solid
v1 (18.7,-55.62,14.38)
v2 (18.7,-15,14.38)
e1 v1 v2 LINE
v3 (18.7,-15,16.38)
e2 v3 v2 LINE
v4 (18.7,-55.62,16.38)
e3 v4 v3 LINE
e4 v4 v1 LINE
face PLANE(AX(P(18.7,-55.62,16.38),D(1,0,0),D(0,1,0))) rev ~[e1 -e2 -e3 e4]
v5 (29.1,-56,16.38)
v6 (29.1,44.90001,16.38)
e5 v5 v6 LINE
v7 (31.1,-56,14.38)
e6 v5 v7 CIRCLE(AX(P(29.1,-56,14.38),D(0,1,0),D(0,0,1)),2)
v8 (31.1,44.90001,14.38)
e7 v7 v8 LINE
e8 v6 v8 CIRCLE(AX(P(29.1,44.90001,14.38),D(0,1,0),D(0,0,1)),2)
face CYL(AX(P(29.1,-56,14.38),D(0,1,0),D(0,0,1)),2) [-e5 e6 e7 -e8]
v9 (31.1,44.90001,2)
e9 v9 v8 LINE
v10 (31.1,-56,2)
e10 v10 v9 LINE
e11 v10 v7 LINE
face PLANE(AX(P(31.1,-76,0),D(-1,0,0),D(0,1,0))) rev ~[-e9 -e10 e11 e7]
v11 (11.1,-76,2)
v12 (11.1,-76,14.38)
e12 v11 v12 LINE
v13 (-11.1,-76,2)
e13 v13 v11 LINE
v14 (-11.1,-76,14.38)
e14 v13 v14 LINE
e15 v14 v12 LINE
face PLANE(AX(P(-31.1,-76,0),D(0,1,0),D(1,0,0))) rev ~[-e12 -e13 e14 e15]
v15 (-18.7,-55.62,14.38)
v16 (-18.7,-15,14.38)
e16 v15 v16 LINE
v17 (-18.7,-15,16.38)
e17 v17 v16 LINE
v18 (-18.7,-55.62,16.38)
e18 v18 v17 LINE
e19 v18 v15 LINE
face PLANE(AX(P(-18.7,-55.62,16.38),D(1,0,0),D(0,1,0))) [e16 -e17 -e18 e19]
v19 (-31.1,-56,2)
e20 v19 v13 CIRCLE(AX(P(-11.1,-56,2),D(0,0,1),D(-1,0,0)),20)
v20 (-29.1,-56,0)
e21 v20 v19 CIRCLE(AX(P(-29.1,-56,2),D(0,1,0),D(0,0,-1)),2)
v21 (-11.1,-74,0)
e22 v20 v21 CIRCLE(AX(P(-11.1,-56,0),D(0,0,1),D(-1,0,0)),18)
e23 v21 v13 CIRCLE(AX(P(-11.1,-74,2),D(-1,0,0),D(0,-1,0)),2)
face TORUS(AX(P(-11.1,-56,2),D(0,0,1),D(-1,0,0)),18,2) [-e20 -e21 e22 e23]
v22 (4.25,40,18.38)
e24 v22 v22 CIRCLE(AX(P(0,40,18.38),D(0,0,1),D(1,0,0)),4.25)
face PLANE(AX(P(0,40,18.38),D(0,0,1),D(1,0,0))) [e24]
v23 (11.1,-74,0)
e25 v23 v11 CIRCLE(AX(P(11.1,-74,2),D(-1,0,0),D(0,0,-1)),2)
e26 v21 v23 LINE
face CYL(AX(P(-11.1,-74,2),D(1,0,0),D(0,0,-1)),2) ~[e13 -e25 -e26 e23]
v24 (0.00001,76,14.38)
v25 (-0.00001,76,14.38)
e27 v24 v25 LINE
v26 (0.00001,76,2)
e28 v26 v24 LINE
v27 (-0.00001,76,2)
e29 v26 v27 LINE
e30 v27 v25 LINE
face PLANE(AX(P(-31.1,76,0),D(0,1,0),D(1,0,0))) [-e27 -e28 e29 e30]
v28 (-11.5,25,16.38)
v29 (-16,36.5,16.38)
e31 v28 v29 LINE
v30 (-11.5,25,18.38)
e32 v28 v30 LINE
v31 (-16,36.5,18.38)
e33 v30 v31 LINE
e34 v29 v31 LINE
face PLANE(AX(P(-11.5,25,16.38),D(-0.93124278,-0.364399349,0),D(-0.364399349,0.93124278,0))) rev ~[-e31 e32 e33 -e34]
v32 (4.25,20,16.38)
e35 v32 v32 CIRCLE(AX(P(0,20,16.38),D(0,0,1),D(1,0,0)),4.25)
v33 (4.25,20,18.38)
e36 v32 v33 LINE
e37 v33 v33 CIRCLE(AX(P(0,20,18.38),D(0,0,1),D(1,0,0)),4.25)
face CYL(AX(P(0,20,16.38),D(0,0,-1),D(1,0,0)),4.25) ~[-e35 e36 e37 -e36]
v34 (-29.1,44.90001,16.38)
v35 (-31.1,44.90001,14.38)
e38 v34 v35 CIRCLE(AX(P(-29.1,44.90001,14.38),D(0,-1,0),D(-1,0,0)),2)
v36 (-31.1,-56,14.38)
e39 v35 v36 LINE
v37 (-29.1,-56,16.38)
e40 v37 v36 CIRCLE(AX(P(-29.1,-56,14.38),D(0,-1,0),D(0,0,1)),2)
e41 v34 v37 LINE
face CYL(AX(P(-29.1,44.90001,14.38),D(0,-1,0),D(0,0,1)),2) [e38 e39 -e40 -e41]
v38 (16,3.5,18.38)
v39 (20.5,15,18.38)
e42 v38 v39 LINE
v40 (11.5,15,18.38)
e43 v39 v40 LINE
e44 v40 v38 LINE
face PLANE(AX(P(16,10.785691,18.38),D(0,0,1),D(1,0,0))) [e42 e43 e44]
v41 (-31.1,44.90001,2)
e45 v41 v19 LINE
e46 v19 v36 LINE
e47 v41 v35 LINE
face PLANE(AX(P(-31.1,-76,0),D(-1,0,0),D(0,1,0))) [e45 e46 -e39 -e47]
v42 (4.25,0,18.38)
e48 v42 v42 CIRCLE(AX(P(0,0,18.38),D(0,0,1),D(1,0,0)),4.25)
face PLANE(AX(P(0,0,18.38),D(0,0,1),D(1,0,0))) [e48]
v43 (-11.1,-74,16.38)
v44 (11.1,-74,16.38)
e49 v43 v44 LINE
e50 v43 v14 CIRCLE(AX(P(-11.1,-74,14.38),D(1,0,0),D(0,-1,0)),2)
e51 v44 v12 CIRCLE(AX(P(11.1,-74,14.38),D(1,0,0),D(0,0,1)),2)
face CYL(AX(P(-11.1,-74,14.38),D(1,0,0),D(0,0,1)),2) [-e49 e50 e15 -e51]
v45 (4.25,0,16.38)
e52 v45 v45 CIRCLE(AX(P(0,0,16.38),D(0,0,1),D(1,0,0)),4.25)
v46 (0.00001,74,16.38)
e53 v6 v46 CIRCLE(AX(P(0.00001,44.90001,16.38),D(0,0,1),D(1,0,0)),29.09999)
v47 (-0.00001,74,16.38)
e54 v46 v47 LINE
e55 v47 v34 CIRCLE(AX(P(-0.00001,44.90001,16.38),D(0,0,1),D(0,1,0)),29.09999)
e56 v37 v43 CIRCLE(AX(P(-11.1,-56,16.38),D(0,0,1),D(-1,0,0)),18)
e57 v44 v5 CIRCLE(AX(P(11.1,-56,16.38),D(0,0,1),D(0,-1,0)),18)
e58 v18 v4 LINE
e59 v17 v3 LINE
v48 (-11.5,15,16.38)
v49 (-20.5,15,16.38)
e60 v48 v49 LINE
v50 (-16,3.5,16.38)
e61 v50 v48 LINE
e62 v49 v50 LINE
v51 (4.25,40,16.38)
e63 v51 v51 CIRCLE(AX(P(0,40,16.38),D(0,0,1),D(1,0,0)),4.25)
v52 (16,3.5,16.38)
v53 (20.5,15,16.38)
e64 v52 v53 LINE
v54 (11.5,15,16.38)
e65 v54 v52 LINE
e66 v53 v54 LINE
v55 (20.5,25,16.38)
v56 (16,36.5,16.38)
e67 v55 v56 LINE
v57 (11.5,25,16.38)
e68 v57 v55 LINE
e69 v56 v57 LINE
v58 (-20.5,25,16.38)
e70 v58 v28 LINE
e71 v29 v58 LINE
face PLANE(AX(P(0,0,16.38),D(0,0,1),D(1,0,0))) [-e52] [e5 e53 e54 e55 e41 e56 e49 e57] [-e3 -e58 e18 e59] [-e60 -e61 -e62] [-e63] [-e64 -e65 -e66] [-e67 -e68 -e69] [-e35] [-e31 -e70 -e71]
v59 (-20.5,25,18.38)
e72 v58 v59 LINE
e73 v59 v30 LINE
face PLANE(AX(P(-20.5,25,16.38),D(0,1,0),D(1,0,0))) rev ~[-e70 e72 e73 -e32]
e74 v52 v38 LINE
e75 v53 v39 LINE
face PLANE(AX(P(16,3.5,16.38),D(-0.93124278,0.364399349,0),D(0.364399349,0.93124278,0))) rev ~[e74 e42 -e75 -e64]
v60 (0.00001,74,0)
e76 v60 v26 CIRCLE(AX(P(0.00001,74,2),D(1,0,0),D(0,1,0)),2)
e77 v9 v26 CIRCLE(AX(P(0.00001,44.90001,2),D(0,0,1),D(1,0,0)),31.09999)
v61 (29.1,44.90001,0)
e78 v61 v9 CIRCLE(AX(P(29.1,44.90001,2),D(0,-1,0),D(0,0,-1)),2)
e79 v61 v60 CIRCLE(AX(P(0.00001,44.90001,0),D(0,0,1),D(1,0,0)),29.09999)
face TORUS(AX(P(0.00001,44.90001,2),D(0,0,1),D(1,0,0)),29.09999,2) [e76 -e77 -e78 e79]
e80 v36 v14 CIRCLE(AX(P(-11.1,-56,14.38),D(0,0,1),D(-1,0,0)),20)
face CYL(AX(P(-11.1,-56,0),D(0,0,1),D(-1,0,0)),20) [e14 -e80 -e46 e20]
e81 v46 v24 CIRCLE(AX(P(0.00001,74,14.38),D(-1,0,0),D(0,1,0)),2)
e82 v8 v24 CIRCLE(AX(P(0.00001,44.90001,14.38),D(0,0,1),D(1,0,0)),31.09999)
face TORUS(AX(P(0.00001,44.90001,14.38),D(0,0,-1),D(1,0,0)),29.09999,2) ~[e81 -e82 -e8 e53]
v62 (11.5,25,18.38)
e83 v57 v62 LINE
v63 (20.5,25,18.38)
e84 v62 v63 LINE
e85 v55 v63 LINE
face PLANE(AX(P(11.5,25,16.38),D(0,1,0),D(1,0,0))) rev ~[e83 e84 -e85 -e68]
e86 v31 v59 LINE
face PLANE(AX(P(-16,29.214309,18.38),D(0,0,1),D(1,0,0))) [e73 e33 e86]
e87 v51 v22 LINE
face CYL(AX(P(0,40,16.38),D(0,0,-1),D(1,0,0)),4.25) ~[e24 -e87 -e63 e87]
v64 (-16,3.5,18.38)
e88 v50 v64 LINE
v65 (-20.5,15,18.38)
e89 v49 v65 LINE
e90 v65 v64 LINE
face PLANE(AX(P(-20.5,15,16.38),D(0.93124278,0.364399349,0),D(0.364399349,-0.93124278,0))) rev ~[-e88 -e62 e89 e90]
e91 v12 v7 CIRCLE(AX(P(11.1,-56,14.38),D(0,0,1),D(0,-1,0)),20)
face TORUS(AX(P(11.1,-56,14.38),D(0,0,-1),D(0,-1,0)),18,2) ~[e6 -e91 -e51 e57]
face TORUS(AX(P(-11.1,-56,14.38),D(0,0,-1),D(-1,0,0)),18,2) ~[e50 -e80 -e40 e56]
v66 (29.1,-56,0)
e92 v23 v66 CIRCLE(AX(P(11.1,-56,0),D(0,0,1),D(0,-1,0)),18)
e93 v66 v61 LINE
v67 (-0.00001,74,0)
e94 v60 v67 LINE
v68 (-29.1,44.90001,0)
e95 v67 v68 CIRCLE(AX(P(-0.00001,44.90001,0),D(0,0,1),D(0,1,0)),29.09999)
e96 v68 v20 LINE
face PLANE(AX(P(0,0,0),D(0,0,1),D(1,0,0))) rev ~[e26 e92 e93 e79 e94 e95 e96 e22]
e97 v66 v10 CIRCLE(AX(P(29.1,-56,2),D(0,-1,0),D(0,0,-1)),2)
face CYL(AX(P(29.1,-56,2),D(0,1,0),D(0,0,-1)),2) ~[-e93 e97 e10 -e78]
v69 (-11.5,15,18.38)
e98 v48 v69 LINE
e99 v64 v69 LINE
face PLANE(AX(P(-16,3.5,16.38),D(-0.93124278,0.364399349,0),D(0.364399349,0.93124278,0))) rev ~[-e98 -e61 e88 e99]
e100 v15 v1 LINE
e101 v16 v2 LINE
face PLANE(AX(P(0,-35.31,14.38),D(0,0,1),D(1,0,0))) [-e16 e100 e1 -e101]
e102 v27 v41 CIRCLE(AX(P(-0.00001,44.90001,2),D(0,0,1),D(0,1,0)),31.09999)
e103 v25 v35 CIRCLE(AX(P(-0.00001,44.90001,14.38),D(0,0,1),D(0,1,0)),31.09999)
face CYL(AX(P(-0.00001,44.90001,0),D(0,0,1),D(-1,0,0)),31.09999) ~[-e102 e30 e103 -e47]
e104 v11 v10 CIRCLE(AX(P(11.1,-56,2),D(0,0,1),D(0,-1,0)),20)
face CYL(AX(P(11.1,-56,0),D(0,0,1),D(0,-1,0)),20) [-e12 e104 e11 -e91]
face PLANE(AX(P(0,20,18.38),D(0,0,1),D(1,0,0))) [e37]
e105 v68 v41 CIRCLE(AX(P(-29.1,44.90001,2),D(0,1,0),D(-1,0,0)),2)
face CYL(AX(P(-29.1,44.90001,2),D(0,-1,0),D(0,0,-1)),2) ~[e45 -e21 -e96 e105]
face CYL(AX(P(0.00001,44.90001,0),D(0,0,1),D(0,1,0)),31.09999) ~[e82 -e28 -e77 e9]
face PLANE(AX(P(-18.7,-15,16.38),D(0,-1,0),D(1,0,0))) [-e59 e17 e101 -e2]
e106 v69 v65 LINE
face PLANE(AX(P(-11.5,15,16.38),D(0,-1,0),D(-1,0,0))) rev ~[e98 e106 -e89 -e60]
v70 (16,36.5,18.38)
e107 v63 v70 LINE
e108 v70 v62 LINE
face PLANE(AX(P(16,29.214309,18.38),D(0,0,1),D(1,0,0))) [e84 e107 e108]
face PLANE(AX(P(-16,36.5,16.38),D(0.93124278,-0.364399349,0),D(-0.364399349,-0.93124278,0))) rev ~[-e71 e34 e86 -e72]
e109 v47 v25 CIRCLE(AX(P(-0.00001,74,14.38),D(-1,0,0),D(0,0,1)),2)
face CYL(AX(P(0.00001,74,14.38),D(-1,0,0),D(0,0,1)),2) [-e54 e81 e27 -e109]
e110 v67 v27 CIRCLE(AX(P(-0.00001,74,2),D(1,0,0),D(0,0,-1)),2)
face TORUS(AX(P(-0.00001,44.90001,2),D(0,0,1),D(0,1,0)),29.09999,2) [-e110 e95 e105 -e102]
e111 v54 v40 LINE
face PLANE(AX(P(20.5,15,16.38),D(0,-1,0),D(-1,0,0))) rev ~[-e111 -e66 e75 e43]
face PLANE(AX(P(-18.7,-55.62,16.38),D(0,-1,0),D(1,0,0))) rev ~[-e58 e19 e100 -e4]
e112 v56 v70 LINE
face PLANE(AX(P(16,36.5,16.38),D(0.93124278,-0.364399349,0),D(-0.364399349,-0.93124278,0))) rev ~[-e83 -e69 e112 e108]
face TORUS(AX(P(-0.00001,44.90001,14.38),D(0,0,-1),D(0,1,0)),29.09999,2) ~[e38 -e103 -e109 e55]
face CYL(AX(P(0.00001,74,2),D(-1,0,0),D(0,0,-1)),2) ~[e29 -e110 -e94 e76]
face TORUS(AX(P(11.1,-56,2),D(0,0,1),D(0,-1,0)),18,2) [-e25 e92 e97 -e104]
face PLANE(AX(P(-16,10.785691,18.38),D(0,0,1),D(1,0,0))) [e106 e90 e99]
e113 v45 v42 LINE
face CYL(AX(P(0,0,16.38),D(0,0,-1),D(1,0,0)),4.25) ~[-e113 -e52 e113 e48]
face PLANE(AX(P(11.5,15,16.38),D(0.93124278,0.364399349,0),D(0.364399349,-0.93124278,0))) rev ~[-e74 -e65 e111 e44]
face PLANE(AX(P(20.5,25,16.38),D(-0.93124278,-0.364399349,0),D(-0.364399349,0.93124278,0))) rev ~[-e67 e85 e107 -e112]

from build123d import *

# Parameters (mm, degrees)
F0_W     = 62.2
F0_H     = 152
F1_DEPTH = 16.38
F2_R     = 20
F3_R     = 31.09999
F4_R     = 2
F5_W     = 37.4
F5_H     = 40.62
F6_DEPTH = 2
F7_R     = 4.25
F8_DEPTH = 2


# Not quite as in the source:
# - a fillet or chamfer is up to 0.001 mm smaller than in the source, because OpenCascade refuses the exact size


with BuildPart() as f1:
    # F0 (on Top) → F1 (new body)
    with BuildSketch(Plane.XY):
        Rectangle(F0_W, F0_H)
    extrude(amount=F1_DEPTH)

    # F2
    f2_edges = [f1.edges().sort_by_distance(p)[0] for p in [
        (-31.1, -76, 8.19),
        (31.1, -76, 8.19),
    ]]
    fillet(f2_edges, radius=F2_R)

    # F3 (radius 31.1 in the source; OpenCascade refuses exactly that, so slightly less here)
    f3_edges = [f1.edges().sort_by_distance(p)[0] for p in [
        (31.1, 76, 8.19),
        (-31.1, 76, 8.19),
    ]]
    fillet(f3_edges, radius=F3_R)

    # F4
    f4_edges = [f1.edges().sort_by_distance(p)[0] for p in [
        (31.1, -5.549995, 16.38),
        (31.1, -5.549995, 0),
    ]]
    fillet(f4_edges, radius=F4_R)

    # F5 (on face) → F6 (cut)
    with BuildSketch(Plane.XY.offset(16.38)):
        with Locations((0, -35.31)):
            Rectangle(F5_W, F5_H)
    extrude(amount=-F6_DEPTH, mode=Mode.SUBTRACT)

    # F7 (on face) → F8 (join)
    with BuildSketch(Plane.XY.offset(16.38)):
        Polygon((11.5, 15), (16, 3.5), (20.5, 15), align=None)
        Circle(F7_R)
        Polygon((-16, 3.5), (-11.5, 15), (-20.5, 15), align=None)
        Polygon((-20.5, 25), (-11.5, 25), (-16, 36.5), align=None)
        with Locations((0, 20)):
            Circle(F7_R)
        Polygon((11.5, 25), (20.5, 25), (16, 36.5), align=None)
        with Locations((0, 40)):
            Circle(F7_R)
    extrude(amount=F8_DEPTH)


solid = f1.part
